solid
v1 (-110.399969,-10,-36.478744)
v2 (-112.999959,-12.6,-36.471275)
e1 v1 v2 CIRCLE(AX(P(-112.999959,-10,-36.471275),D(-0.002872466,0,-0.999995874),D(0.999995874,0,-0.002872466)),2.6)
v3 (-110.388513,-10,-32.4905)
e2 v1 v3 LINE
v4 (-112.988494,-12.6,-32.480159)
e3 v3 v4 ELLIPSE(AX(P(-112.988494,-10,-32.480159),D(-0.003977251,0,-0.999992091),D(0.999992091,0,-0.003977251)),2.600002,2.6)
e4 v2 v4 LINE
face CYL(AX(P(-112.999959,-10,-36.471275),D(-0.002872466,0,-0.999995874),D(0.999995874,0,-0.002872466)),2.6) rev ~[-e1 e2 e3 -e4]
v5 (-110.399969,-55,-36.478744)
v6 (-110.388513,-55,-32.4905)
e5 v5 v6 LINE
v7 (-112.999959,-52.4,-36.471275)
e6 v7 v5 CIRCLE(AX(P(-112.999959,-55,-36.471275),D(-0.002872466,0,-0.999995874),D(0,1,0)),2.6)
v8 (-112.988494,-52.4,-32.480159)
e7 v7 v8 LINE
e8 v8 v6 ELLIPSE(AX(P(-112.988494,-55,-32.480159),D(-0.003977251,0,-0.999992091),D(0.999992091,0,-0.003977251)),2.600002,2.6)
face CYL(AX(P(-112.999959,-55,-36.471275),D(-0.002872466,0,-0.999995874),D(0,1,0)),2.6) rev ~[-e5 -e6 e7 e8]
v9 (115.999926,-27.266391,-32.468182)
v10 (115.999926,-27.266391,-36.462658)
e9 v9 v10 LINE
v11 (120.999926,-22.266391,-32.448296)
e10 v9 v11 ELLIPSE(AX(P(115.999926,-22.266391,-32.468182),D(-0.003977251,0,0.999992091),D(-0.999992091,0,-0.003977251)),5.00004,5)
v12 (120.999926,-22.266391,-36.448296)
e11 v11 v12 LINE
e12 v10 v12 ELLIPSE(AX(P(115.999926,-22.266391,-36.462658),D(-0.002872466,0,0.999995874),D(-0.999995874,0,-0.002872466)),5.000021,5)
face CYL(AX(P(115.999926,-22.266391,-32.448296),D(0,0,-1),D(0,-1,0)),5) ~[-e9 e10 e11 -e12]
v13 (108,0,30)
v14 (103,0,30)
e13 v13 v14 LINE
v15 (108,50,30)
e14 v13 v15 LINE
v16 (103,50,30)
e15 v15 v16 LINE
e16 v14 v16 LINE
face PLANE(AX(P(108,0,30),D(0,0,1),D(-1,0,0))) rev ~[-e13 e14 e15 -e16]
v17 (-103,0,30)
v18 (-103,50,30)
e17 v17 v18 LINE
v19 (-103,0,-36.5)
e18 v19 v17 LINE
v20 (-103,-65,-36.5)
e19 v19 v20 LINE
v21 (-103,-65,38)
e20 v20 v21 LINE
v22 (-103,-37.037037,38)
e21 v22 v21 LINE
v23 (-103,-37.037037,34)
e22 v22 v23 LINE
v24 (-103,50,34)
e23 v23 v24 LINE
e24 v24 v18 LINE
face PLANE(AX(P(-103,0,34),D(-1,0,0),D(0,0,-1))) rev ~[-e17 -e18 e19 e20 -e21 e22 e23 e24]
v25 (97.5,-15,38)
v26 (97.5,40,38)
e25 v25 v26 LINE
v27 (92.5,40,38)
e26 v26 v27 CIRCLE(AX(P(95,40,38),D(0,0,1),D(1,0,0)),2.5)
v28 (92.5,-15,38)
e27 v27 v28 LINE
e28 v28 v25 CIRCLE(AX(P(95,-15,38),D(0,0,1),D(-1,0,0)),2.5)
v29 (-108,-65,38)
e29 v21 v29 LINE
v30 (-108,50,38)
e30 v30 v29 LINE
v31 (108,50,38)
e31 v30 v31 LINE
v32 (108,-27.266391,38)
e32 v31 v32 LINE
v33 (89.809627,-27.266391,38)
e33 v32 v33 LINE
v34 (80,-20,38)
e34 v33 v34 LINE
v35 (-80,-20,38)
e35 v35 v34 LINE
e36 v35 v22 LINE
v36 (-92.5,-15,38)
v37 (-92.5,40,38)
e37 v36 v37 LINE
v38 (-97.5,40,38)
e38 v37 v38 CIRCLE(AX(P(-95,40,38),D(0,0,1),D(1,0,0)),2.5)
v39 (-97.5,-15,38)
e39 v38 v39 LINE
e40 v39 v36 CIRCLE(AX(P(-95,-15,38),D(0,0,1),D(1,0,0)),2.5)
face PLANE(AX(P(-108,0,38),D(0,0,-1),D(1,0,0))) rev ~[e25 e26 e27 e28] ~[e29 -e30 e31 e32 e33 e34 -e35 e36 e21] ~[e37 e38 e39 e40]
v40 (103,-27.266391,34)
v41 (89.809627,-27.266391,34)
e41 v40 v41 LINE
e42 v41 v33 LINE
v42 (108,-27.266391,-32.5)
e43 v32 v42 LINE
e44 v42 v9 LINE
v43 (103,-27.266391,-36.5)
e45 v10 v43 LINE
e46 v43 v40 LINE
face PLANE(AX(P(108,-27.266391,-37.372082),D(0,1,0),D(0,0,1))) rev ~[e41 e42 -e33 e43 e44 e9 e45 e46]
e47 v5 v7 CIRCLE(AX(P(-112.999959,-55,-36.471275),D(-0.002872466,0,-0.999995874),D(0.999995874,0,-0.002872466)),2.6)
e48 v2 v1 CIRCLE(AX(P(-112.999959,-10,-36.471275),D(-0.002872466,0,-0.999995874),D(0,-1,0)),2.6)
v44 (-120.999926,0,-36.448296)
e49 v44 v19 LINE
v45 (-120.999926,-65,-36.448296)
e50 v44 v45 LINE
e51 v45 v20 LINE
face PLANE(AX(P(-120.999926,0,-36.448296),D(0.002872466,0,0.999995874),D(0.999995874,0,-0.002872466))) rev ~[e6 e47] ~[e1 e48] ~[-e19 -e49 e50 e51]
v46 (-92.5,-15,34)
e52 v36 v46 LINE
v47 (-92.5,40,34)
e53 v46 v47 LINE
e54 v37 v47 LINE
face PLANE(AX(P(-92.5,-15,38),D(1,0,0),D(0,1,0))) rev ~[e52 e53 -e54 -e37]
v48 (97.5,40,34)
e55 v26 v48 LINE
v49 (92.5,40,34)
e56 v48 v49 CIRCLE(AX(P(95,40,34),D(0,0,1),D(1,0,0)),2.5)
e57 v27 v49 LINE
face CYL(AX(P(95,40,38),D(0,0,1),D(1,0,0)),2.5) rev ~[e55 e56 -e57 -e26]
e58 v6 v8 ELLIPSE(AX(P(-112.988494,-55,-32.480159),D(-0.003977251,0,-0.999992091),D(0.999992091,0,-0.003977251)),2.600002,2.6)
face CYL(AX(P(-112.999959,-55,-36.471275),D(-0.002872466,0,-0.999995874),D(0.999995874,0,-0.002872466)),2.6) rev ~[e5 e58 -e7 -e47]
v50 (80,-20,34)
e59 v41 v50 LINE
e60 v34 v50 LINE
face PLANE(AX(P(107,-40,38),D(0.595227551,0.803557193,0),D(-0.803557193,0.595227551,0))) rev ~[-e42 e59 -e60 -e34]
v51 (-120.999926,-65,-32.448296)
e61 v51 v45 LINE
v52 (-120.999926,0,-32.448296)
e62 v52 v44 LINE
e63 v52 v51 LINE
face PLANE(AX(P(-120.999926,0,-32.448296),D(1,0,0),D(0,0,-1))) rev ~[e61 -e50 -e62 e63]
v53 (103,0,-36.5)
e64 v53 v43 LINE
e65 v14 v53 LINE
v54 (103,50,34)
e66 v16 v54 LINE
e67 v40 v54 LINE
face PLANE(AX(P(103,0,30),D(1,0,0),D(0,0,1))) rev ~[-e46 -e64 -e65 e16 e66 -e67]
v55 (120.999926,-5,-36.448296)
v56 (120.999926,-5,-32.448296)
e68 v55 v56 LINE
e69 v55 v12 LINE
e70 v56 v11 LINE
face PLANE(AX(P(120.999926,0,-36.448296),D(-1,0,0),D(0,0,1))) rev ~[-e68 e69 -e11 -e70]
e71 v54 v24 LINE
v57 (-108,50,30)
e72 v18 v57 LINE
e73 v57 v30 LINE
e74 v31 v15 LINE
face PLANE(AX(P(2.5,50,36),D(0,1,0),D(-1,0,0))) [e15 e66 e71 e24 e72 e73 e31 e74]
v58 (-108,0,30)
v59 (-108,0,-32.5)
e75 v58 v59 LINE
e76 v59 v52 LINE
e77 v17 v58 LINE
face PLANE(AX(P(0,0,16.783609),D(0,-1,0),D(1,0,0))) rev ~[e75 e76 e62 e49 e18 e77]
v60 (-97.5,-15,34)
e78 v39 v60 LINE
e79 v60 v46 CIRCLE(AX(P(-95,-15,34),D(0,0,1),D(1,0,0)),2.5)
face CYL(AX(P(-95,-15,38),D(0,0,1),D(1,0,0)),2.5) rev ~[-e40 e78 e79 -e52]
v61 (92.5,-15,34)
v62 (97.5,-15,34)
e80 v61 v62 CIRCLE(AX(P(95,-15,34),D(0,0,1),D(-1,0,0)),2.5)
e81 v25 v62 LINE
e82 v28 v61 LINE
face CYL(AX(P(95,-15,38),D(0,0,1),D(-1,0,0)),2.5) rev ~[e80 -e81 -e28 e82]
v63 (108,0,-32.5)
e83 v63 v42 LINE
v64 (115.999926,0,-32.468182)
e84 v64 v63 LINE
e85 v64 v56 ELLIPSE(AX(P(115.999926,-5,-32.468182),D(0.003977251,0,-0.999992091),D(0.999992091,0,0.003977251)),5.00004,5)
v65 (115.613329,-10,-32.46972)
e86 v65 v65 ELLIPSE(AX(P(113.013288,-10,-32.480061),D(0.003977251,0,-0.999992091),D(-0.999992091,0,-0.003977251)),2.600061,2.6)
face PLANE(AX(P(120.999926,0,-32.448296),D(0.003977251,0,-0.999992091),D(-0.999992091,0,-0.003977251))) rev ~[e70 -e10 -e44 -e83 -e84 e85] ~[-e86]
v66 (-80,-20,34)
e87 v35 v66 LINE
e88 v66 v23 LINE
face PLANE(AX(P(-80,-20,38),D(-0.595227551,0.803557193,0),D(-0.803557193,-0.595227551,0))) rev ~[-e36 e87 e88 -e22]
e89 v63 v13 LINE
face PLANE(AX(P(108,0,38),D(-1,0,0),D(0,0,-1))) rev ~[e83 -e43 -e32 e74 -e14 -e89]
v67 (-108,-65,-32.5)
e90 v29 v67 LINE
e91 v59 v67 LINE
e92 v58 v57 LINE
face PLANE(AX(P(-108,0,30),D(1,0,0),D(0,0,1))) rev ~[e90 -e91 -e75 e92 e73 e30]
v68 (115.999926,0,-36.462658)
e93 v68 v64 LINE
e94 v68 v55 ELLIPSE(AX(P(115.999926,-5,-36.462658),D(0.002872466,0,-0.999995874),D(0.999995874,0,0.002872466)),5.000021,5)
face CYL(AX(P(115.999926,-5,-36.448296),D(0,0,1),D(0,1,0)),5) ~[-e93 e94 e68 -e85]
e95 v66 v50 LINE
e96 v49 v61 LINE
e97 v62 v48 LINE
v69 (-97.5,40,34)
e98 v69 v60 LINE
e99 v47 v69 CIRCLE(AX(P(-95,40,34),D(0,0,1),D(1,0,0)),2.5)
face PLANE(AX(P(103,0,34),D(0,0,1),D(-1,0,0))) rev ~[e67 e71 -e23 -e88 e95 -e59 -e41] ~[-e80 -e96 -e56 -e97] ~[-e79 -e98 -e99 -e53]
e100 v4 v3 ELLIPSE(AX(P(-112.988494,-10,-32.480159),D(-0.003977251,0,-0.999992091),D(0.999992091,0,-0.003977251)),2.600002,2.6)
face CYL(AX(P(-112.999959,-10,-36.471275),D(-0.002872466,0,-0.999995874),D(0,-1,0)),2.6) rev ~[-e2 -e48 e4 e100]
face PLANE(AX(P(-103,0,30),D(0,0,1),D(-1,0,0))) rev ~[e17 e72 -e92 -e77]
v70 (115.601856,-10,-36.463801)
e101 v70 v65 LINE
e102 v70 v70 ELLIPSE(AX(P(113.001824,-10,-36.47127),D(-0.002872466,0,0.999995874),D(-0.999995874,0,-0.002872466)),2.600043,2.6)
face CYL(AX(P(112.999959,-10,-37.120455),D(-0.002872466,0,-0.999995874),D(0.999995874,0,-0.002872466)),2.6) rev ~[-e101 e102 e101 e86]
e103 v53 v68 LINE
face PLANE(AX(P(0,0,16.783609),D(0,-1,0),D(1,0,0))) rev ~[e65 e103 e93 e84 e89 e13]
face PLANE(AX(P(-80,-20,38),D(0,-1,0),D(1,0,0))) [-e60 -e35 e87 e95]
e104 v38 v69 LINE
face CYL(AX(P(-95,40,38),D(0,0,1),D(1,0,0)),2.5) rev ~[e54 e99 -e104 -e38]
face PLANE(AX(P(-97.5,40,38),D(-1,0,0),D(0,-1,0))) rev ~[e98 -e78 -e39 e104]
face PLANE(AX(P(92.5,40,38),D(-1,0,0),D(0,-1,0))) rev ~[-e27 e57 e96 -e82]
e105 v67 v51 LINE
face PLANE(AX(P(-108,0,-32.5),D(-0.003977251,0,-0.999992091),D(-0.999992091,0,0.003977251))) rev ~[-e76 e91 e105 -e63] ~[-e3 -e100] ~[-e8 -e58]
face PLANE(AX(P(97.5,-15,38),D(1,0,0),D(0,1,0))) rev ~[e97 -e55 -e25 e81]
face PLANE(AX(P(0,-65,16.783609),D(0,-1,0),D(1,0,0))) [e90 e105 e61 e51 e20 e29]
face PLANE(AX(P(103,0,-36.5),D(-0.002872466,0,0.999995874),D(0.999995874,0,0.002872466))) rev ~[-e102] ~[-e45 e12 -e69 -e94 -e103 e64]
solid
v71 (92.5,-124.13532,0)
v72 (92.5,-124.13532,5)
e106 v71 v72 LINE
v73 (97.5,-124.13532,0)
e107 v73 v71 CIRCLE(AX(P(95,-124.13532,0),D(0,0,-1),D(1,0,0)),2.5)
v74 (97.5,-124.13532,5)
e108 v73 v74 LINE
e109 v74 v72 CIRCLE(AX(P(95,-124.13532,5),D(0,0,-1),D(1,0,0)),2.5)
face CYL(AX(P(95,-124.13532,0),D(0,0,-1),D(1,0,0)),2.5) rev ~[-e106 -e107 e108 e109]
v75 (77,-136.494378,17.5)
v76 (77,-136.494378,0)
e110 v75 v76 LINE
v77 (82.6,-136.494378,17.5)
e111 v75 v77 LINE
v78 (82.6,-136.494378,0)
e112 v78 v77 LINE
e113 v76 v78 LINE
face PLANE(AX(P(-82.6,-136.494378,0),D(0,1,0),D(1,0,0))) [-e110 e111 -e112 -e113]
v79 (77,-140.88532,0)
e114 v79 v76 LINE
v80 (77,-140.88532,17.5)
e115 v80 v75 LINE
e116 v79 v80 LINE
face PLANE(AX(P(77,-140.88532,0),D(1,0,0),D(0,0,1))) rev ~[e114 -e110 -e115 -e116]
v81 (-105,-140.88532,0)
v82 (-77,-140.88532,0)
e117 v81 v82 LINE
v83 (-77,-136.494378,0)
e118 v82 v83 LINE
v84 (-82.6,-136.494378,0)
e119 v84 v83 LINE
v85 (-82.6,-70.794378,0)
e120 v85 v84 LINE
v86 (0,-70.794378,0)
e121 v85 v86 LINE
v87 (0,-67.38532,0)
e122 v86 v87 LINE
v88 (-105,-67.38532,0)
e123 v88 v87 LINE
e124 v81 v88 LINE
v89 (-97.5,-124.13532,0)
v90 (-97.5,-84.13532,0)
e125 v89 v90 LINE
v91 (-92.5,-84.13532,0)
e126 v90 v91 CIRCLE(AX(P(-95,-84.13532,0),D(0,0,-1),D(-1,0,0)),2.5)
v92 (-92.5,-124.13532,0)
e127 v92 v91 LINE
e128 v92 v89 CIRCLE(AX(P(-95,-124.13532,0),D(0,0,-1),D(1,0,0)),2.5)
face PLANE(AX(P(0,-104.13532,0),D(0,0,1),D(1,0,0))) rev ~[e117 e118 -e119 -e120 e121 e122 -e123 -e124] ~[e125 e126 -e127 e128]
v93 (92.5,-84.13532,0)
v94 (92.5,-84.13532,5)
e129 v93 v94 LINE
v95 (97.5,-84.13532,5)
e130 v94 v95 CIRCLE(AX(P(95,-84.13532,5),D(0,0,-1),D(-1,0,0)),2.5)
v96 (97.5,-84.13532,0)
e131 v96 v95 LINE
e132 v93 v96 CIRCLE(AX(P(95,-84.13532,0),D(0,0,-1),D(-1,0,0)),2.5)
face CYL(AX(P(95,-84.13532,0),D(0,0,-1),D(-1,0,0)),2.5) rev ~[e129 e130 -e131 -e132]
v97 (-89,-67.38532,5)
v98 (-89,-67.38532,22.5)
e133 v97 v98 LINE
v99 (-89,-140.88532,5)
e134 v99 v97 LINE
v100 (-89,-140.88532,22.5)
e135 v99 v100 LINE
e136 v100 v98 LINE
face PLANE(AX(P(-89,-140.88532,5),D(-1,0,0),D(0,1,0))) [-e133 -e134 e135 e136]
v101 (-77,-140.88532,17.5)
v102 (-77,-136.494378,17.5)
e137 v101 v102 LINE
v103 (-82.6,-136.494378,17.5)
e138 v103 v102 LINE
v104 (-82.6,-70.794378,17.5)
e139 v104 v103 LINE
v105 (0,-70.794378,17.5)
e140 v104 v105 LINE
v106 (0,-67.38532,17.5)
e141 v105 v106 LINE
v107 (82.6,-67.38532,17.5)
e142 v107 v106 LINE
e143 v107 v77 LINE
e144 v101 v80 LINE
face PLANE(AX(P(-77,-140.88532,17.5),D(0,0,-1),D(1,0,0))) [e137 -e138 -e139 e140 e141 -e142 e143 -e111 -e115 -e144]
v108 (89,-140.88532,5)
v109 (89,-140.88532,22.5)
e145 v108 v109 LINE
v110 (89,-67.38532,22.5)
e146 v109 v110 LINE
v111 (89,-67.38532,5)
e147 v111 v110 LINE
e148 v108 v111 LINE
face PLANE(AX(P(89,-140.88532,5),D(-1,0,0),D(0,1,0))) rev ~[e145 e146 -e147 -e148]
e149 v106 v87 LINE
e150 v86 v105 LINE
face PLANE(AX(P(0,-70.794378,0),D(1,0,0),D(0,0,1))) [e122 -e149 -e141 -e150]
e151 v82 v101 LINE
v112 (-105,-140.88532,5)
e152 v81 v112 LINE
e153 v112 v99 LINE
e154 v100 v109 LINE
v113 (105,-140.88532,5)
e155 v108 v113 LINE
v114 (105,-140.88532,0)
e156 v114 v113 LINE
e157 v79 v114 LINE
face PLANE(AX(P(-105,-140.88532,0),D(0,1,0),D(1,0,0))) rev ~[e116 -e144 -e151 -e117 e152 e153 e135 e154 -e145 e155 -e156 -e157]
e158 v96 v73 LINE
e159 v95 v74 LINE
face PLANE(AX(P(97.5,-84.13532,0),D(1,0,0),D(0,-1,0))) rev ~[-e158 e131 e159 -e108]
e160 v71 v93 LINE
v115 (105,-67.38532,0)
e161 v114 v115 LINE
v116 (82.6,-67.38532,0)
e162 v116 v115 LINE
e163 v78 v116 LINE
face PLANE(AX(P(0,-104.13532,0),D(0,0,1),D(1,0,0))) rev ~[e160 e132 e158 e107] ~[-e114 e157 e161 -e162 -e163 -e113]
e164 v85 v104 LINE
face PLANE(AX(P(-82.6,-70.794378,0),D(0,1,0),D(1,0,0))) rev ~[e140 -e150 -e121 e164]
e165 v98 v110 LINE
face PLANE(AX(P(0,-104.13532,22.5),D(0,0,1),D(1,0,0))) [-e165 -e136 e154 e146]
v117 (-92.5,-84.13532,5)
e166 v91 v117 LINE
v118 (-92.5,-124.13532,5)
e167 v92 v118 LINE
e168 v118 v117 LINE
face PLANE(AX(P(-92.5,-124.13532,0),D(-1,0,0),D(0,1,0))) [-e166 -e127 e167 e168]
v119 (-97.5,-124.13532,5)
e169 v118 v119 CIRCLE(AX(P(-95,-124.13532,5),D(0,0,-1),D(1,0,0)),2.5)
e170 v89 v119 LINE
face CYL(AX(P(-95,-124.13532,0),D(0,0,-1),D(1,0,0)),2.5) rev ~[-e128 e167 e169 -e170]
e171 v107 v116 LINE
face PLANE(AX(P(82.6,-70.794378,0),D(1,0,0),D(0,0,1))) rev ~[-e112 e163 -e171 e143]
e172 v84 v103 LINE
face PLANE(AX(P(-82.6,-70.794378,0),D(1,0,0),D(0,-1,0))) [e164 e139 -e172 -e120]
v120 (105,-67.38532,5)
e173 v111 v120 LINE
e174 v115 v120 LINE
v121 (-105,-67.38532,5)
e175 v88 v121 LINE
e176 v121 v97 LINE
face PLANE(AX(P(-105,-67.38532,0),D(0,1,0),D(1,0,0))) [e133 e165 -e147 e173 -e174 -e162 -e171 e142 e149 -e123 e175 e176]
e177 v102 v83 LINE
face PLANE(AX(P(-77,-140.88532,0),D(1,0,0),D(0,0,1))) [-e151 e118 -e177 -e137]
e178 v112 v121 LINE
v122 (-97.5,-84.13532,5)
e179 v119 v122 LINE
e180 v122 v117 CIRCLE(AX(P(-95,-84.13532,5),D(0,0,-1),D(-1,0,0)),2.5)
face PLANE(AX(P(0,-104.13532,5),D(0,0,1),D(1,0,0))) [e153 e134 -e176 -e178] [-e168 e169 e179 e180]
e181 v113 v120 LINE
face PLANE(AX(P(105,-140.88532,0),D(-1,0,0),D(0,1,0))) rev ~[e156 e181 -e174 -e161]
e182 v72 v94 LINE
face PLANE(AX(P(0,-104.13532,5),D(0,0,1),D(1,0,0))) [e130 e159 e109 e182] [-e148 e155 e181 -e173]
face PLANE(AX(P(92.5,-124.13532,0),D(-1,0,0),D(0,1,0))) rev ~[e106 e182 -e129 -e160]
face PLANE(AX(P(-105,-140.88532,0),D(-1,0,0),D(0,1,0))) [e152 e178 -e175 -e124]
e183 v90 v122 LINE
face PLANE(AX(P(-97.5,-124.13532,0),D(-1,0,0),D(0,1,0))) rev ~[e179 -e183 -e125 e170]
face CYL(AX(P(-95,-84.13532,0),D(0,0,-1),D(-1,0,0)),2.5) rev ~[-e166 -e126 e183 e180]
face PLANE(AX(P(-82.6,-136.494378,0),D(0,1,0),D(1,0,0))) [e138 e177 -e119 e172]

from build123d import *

# Parameters (mm, degrees)
F1_DEPTH  = 65
F2_W      = 160
F2_H      = 45
F3_DEPTH  = 4
F4_W      = 5
F4_H      = 4
F5_DEPTH  = 50
F6_W      = 37.7336093783
F6_H      = 70.5
F6_H_2    = 4.8720824718
F7_DEPTH  = 25
F8_R      = 2.6
F9_DEPTH  = 25
F10_R     = 5
F12_DEPTH = 25
F13_W     = 210
F13_H     = 73.5
F13_W_2   = 185
F13_H_2   = 40
F14_DEPTH = 5
F15_W     = 178
F15_H     = 73.5
F16_DEPTH = 17.5
F17_W     = 165.2
F17_H     = 65.7
F18_DEPTH = 17.5
F19_W     = 154
F19_H     = 17.5
F20_DEPTH = 25
F21_W     = 82.6
F21_H     = 17.5
F22_DEPTH = 25


# Not quite as in the source:
# - a feature names something its author has since deleted; it is built from what else it names


with BuildPart() as f1:
    # F0 (on Front) → F1 (new body)
    with BuildSketch(Plane.XZ):
        Polygon((108, -32.5), (108, 38), (-108, 38), (-108, -32.5), (-120.9999257403, -32.4482956199), (-120.9999257403, -36.4482956199), (-103, -36.5), (-103, 34), (0, 34), (103, 34), (103, -36.5), (120.9999257403, -36.4482956199), (120.9999257403, -32.4482956199), align=None)
    extrude(amount=F1_DEPTH)

    # F2 (on face) → F3 (cut, through all)
    with BuildSketch(Plane.XY.offset(38)):
        with Locations((0, -42.5)):
            Rectangle(F2_W, F2_H)
        Polygon((80, -20), (80, -65), (107, -65), (107, -40), align=None)
        Polygon((-103, -65), (-80, -65), (-80, -20), (-103, -37.037037037), align=None)
    extrude(amount=-F3_DEPTH, mode=Mode.SUBTRACT)

    # F4 (on face) → F5 (join)
    with BuildSketch(Plane(origin=(0, 0, 0), x_dir=(-1, 0, 0), z_dir=(0, 1, 0))):
        Polygon((103, 38), (-108, 38), (-108, 34), (-103, 34), (103, 34), align=None)
        with Locations((-105.5, 32)):
            Rectangle(F4_W, F4_H)
        Polygon((108, 38), (103, 38), (103, 34), (103, 30), (108, 30), (108, 34), align=None)
    extrude(amount=F5_DEPTH)

    # F6 (on face) → F7 (cut, symmetric)
    with BuildSketch(Plane.YZ.offset(108)):
        with Locations((-46.1331953108, 2.75)):
            Rectangle(F6_W, F6_H)
        with Locations((-46.1331953108, -34.9360412359)):
            Rectangle(F6_W, F6_H_2)
    extrude(amount=F7_DEPTH, both=True, mode=Mode.SUBTRACT)

    # F8 (on face) → F9 (cut)
    with BuildSketch(Plane(origin=(-0.1056944195, 0, -36.7955615686), x_dir=(0.9999958745, 0, -0.0028724656), z_dir=(-0.0028724656, 0, -0.9999958745))):
        with BuildLine():
            ThreePointArc((-112.8947300766, 12.6), (-114.7332077077, 8.1615223689), (-110.2947300766, 10))
            ThreePointArc((-110.2947300766, 10), (-111.0562524455, 11.8384776311), (-112.8947300766, 12.6))
        make_face()
        with BuildLine():
            ThreePointArc((-110.2947300766, 55), (-114.7332077077, 56.8384776311), (-112.8947300766, 52.4))
            ThreePointArc((-112.8947300766, 52.4), (-111.0562524455, 53.1615223689), (-110.2947300766, 55))
        make_face()
        with Locations((113.1061197876, 55)):
            Circle(F8_R)
        with Locations((113.1061197876, 10)):
            Circle(F8_R)
    extrude(amount=-F9_DEPTH, mode=Mode.SUBTRACT)

    # F10
    f10_edges = [f1.edges().sort_by_distance(p)[0] for p in [
        (120.999926, 0, -34.448296),
        (120.999926, -27.266391, -34.448296),
    ]]
    fillet(f10_edges, radius=F10_R)

    # F11 (on face) → F12 (cut)
    with BuildSketch(Plane.XY.offset(38)):
        with BuildLine():
            Line((-95, 40), (-92.5, 40))
            ThreePointArc((-92.5, 40), (-95, 42.5), (-97.5, 40))
            ThreePointArc((-97.5, 40), (-96.767766953, 38.232233047), (-95, 37.5))
            Line((-95, 37.5), (-95, 40))
        make_face()
        with BuildLine():
            ThreePointArc((-95, 37.5), (-93.232233047, 38.232233047), (-92.5, 40))
            Line((-92.5, 40), (-95, 40))
            Line((-95, 40), (-95, 37.5))
        make_face()
        with BuildLine():
            Line((-92.5, 0), (-95, 0))
            Line((-95, 0), (-95, 2.5))
            ThreePointArc((-95, 2.5), (-96.767766953, 1.767766953), (-97.5, 0))
            ThreePointArc((-97.5, 0), (-95, -2.5), (-92.5, 0))
        make_face()
        with BuildLine():
            Line((-95, 2.5), (-95, 0))
            Line((-95, 0), (-92.5, 0))
            ThreePointArc((-92.5, 0), (-93.232233047, 1.767766953), (-95, 2.5))
        make_face()
        with BuildLine():
            Line((95, 0), (92.5, 0))
            ThreePointArc((92.5, 0), (93.232233047, -1.767766953), (95, -2.5))
            Line((95, -2.5), (95, 0))
        make_face()
        with BuildLine():
            ThreePointArc((95, 2.5), (93.232233047, 1.767766953), (92.5, 0))
            Line((92.5, 0), (95, 0))
            Line((95, 0), (95, 2.5))
        make_face()
        with BuildLine():
            ThreePointArc((97.5, 40), (95, 42.5), (92.5, 40))
            Line((92.5, 40), (95, 40))
            Line((95, 40), (95, 37.5))
            ThreePointArc((95, 37.5), (96.767766953, 38.232233047), (97.5, 40))
        make_face()
        with BuildLine():
            Line((95, 40), (92.5, 40))
            ThreePointArc((92.5, 40), (93.232233047, 38.232233047), (95, 37.5))
            Line((95, 37.5), (95, 40))
        make_face()
        with BuildLine():
            Line((95, 37.5), (95, 2.5))
            ThreePointArc((95, 2.5), (96.767766953, 1.767766953), (97.5, 0))
            Line((97.5, 0), (97.5, 40))
            ThreePointArc((97.5, 40), (96.767766953, 38.232233047), (95, 37.5))
        make_face()
        with BuildLine():
            Line((95, 2.5), (95, 0))
            Line((95, 0), (95, -2.5))
            ThreePointArc((95, -2.5), (96.767766953, -1.767766953), (97.5, 0))
            ThreePointArc((97.5, 0), (96.767766953, 1.767766953), (95, 2.5))
        make_face()
        with BuildLine():
            ThreePointArc((97.5, 0), (96.767766953, -1.767766953), (95, -2.5))
            Line((95, -2.5), (95, -12.5))
            ThreePointArc((95, -12.5), (96.767766953, -13.232233047), (97.5, -15))
            Line((97.5, -15), (97.5, 0))
        make_face()
        with BuildLine():
            ThreePointArc((95, -12.5), (93.232233047, -13.232233047), (92.5, -15))
            ThreePointArc((92.5, -15), (95, -17.5), (97.5, -15))
            ThreePointArc((97.5, -15), (96.767766953, -13.232233047), (95, -12.5))
        make_face()
        with BuildLine():
            Line((92.5, 40), (92.5, 0))
            ThreePointArc((92.5, 0), (93.232233047, 1.767766953), (95, 2.5))
            Line((95, 2.5), (95, 37.5))
            ThreePointArc((95, 37.5), (93.232233047, 38.232233047), (92.5, 40))
        make_face()
        with BuildLine():
            ThreePointArc((95, -2.5), (93.232233047, -1.767766953), (92.5, 0))
            Line((92.5, 0), (92.5, -15))
            ThreePointArc((92.5, -15), (93.232233047, -13.232233047), (95, -12.5))
            Line((95, -12.5), (95, -2.5))
        make_face()
        with BuildLine():
            ThreePointArc((-95, 2.5), (-93.232233047, 1.767766953), (-92.5, 0))
            Line((-92.5, 0), (-92.5, 40))
            ThreePointArc((-92.5, 40), (-93.232233047, 38.232233047), (-95, 37.5))
            Line((-95, 37.5), (-95, 2.5))
        make_face()
        with BuildLine():
            ThreePointArc((-97.5, 0), (-96.767766953, 1.767766953), (-95, 2.5))
            Line((-95, 2.5), (-95, 37.5))
            ThreePointArc((-95, 37.5), (-96.767766953, 38.232233047), (-97.5, 40))
            Line((-97.5, 40), (-97.5, 0))
        make_face()
        with BuildLine():
            ThreePointArc((-97.5, -15), (-95, -17.5), (-92.5, -15))
            ThreePointArc((-92.5, -15), (-95, -12.5), (-97.5, -15))
        make_face()
        with BuildLine():
            Line((-92.5, -15), (-92.5, 0))
            ThreePointArc((-92.5, 0), (-95, -2.5), (-97.5, 0))
            Line((-97.5, 0), (-97.5, -15))
            ThreePointArc((-97.5, -15), (-95, -12.5), (-92.5, -15))
        make_face()
    extrude(amount=-F12_DEPTH, mode=Mode.SUBTRACT)


with BuildPart() as f14:
    # F13 (on Top) → F14 (new body)
    with BuildSketch(Plane.XY):
        with Locations((0, -104.1353195906)):
            Rectangle(F13_W, F13_H)
        with BuildLine():
            ThreePointArc((97.5, -124.1353195906), (95, -126.6353195906), (92.5, -124.1353195906))
            Line((92.5, -124.1353195906), (-92.5, -124.1353195906))
            ThreePointArc((-92.5, -124.1353195906), (-95, -126.6353195906), (-97.5, -124.1353195906))
            Line((-97.5, -124.1353195906), (-97.5, -84.1353195906))
            ThreePointArc((-97.5, -84.1353195906), (-95, -81.6353195906), (-92.5, -84.1353195906))
            Line((-92.5, -84.1353195906), (92.5, -84.1353195906))
            ThreePointArc((92.5, -84.1353195906), (95, -81.6353195906), (97.5, -84.1353195906))
            Line((97.5, -84.1353195906), (97.5, -124.1353195906))
        make_face(mode=Mode.SUBTRACT)
        with Locations((0, -104.1353195906)):
            Rectangle(F13_W_2, F13_H_2)
    extrude(amount=F14_DEPTH)

    # F15 (on face) → F16 (join)
    with BuildSketch(Plane.XY.offset(5)):
        with Locations((0, -104.1353195906)):
            Rectangle(F15_W, F15_H)
    extrude(amount=F16_DEPTH)

    # F17 (on face) → F18 (cut)
    with BuildSketch(Plane(origin=(0, 0, 0), x_dir=(1, 0, 0), z_dir=(0, 0, -1))):
        with Locations((0, 103.6443784833)):
            Rectangle(F17_W, F17_H)
    extrude(amount=-F18_DEPTH, mode=Mode.SUBTRACT)

    # F19 (on face) → F20 (cut)
    with BuildSketch(Plane.XZ.offset(140.8853195906)):
        with Locations((0, 8.75)):
            Rectangle(F19_W, F19_H)
    extrude(amount=-F20_DEPTH, mode=Mode.SUBTRACT)

    # F21 (on face) → F22 (cut)
    with BuildSketch(Plane.XZ.offset(70.7943784833)):
        with Locations((41.3, 8.75)):
            Rectangle(F21_W, F21_H)
    extrude(amount=-F22_DEPTH, mode=Mode.SUBTRACT)


solid = Compound([f1.part, f14.part])
